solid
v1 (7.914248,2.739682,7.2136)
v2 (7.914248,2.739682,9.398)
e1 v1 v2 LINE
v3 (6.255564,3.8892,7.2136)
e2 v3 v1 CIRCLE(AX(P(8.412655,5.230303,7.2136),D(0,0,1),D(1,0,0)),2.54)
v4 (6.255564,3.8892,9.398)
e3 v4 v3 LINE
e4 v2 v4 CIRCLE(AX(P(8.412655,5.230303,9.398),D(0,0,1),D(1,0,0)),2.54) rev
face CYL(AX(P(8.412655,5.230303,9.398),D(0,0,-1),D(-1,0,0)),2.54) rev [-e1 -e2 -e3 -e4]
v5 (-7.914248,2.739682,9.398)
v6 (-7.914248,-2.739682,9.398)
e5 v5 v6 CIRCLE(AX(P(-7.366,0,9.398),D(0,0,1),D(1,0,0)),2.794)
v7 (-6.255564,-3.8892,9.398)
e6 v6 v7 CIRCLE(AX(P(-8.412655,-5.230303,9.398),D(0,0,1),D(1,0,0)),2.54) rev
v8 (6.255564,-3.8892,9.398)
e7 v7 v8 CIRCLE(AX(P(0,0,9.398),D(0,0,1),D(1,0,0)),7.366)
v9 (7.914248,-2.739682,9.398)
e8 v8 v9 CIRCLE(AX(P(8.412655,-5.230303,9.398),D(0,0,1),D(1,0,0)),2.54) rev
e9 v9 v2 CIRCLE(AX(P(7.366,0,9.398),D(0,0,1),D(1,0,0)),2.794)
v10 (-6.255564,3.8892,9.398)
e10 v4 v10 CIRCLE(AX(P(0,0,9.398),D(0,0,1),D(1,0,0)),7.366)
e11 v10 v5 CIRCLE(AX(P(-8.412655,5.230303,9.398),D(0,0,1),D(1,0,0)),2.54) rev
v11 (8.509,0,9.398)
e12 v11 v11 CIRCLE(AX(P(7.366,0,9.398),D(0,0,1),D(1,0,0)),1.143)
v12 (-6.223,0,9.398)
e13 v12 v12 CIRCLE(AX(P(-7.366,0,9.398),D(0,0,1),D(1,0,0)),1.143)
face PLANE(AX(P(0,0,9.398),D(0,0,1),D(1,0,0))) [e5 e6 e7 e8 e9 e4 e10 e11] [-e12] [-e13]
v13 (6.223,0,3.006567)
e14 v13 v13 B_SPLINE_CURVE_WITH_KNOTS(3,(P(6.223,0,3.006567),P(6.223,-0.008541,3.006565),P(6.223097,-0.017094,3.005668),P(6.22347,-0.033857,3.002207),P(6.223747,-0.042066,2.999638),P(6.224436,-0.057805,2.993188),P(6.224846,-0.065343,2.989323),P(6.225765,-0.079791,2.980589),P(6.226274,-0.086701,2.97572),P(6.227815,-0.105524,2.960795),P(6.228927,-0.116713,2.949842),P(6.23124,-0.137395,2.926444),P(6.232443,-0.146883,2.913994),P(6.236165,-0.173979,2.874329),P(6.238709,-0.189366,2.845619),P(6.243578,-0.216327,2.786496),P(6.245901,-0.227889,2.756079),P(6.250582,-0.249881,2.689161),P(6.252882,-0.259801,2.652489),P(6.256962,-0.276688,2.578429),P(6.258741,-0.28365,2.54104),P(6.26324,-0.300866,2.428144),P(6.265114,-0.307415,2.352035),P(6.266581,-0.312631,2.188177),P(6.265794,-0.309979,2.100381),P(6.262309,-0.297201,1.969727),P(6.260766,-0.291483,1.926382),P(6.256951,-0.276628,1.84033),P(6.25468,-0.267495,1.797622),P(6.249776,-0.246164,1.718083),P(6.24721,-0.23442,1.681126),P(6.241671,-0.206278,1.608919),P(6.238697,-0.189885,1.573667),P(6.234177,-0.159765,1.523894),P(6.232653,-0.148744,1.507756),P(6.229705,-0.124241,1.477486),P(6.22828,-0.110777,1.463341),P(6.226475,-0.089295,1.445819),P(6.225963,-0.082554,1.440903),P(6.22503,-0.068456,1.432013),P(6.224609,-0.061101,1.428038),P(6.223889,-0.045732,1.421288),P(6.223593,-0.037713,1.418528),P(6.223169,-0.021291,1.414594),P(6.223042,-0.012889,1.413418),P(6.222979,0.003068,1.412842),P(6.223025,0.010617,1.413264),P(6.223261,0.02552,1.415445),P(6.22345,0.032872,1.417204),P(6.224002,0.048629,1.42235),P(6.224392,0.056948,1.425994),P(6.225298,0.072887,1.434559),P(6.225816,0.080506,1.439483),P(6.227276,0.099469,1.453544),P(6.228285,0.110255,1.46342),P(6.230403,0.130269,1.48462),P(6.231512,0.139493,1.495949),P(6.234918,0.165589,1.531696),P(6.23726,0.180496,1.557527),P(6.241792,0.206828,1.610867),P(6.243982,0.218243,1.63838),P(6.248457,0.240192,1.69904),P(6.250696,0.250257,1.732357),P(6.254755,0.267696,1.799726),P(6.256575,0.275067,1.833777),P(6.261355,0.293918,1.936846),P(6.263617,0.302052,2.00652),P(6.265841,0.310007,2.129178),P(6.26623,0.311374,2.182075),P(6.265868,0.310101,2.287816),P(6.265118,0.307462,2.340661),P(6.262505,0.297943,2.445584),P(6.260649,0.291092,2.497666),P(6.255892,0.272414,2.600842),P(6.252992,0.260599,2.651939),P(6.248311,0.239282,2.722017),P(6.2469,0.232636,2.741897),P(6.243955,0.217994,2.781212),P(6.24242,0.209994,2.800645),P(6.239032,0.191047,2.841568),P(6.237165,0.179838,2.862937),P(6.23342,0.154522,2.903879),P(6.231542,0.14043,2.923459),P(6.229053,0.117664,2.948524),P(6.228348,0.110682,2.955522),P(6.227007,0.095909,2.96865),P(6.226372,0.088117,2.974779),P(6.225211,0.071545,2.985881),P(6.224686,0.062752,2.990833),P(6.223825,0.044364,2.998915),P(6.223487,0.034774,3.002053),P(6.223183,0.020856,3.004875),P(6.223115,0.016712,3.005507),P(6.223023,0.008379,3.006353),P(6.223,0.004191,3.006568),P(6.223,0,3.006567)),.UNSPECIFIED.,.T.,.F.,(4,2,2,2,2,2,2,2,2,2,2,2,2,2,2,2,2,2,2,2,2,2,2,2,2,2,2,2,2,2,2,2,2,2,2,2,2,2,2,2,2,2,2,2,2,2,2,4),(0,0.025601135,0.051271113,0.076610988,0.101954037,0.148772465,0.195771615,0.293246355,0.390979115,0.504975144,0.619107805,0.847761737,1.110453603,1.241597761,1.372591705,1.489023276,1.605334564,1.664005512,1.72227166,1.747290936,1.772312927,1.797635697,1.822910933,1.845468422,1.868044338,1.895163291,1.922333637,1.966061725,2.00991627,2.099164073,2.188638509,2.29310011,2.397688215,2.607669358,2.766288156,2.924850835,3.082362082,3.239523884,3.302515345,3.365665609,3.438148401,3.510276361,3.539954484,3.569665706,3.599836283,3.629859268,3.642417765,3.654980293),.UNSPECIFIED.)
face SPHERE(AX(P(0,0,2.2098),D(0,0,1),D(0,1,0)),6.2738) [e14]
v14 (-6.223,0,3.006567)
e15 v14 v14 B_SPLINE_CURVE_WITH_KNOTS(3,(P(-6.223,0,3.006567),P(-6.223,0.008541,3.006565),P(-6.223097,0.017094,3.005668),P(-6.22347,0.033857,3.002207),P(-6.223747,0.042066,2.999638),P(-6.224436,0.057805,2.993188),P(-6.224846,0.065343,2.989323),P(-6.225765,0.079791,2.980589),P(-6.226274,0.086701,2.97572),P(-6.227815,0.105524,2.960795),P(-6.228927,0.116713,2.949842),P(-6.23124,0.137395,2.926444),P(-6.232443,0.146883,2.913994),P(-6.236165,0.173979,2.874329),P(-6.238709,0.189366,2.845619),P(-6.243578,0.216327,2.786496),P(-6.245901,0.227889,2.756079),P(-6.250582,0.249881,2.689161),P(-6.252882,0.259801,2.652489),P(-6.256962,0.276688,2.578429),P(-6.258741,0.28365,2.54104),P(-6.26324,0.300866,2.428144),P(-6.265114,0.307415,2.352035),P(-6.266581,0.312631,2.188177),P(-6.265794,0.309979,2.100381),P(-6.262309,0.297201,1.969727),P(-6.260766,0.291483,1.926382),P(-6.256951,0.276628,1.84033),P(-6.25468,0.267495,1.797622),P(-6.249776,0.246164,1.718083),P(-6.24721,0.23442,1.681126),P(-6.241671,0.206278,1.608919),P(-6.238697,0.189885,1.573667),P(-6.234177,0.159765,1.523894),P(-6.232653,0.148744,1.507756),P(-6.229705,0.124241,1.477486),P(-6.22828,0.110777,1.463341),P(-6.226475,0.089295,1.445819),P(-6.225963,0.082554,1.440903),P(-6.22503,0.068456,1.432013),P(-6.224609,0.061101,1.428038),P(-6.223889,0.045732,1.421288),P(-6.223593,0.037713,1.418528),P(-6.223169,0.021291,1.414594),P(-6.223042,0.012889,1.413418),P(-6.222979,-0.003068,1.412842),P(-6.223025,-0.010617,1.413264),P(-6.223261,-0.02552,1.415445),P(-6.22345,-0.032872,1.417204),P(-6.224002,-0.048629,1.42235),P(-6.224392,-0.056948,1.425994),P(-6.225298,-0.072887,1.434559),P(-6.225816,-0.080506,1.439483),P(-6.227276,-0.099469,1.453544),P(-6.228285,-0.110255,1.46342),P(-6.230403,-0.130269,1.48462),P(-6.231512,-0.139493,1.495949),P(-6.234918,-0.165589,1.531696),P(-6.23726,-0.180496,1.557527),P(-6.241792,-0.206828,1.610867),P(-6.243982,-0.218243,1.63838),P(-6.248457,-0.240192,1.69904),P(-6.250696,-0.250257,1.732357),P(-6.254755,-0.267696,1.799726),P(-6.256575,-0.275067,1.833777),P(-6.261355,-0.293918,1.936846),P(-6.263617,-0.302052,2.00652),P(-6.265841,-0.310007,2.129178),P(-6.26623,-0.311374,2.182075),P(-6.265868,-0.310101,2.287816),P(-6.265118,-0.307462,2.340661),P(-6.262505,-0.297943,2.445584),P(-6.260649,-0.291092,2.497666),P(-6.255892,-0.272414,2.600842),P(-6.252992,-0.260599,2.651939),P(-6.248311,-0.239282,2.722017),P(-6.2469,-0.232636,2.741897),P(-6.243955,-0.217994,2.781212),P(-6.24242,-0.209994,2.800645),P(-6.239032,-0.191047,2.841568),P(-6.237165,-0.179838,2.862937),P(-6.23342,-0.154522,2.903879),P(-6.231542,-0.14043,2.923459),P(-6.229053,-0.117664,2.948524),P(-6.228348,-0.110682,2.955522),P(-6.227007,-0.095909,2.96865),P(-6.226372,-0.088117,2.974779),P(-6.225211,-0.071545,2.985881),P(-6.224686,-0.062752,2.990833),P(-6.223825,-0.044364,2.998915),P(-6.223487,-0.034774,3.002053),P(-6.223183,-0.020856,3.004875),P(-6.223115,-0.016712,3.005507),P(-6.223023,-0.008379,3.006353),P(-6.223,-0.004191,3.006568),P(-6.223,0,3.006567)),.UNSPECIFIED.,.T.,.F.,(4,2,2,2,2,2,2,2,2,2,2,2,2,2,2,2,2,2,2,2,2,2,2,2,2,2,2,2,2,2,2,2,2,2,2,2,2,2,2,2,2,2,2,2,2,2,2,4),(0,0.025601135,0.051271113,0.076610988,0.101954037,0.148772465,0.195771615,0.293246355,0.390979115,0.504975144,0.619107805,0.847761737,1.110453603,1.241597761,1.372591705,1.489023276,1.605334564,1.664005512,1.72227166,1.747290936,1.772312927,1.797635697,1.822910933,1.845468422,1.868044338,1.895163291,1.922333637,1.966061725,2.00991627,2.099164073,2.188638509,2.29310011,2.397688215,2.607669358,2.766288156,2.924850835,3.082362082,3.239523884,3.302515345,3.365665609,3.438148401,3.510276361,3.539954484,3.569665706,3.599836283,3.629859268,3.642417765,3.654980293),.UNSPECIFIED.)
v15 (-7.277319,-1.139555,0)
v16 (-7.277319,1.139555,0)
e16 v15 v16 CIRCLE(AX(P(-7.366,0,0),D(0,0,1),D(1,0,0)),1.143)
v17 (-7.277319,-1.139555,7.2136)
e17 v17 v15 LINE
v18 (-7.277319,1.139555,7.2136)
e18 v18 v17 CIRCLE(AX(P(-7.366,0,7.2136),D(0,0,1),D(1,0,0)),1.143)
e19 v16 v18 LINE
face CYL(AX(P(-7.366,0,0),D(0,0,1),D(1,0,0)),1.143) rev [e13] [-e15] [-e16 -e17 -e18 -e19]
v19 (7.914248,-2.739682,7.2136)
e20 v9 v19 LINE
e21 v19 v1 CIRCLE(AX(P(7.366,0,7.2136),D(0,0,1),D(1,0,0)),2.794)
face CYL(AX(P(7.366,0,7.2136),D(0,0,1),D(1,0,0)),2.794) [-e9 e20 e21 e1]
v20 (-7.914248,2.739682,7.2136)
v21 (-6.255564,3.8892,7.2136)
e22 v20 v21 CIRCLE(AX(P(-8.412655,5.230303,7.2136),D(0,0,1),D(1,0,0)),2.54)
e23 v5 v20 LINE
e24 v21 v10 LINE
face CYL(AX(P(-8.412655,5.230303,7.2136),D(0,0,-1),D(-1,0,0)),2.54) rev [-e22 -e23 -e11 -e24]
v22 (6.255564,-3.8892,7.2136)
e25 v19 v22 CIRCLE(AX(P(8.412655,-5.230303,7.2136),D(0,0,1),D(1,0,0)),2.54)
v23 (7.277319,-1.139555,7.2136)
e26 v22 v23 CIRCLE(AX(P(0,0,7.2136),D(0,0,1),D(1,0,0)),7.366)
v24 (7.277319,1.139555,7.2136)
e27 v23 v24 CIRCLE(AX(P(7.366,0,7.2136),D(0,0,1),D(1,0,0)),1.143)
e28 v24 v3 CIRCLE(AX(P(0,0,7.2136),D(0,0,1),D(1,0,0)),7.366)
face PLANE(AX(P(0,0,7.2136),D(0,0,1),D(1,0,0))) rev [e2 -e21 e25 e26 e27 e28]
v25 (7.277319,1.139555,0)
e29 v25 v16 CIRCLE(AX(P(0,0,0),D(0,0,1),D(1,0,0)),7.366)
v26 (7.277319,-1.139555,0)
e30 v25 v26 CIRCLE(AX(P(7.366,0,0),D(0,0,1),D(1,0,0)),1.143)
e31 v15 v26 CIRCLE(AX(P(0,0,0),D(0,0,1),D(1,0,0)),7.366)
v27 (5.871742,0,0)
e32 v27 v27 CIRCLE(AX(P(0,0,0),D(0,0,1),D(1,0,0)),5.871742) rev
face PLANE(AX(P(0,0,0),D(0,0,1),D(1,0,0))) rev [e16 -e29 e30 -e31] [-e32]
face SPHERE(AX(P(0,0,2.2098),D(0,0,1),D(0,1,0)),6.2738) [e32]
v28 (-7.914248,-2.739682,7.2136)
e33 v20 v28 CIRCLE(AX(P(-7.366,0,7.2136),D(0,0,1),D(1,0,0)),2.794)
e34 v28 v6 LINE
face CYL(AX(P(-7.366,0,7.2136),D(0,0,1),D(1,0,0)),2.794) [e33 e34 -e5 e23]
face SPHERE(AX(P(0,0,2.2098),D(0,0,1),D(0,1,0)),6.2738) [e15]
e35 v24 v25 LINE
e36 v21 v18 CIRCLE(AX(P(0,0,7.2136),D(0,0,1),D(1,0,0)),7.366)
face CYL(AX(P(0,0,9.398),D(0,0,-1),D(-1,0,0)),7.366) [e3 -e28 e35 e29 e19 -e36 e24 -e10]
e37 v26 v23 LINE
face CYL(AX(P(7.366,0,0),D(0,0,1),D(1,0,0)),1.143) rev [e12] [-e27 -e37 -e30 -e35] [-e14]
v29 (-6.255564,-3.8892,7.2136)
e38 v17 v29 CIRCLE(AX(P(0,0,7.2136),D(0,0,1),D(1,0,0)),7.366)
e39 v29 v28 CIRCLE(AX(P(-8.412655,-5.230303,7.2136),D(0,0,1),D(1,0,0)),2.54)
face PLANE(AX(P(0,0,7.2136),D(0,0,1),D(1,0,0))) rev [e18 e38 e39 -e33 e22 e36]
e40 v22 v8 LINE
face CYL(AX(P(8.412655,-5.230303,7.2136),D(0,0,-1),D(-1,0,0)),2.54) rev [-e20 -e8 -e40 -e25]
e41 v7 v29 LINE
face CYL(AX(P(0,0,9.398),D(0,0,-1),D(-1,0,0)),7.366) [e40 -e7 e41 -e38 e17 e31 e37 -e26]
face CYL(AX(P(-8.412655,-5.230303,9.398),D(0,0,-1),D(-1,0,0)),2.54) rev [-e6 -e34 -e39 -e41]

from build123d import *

# Parameters (mm, degrees)
ESQUISSE1_R             = 7.366
BOSS_EXTRU_1_DEPTH      = 9.398
BOSS_EXTRU_2_START      = -2.1844
BOSS_EXTRU_2_DEPTH      = 2.1844
CONG_1_R                = 2.54
ESQUISSE3_R             = 1.143
ENL_V_MAT_EXTRU_2_DEPTH = 16.678200152


with BuildPart() as part:
    # Esquisse1 → Boss.-Extru.1 (new body)
    with BuildSketch(Plane.XY):
        Circle(ESQUISSE1_R)
    extrude(amount=BOSS_EXTRU_1_DEPTH)

    # Esquisse2 → Boss.-Extru.2 (add)
    with BuildSketch(Plane.XY.offset(9.398).offset(BOSS_EXTRU_2_START)):
        with BuildLine():
            Line((7.366, 2.794), (6.815535195, 2.794))
            ThreePointArc((6.815535195, 2.794), (7.22707369, 1.423854584), (7.366, 0))
            Line((7.366, 0), (10.16, 0))
            ThreePointArc((10.16, 0), (9.341656347, 1.975656347), (7.366, 2.794))
        make_face()
        with BuildLine():
            Line((10.16, 0), (7.366, 0))
            ThreePointArc((7.366, 0), (7.22707369, -1.423854584), (6.815535195, -2.794))
            Line((6.815535195, -2.794), (7.366, -2.794))
            ThreePointArc((7.366, -2.794), (9.341656347, -1.975656347), (10.16, 0))
        make_face()
        with BuildLine():
            Line((-7.366, 0), (-10.16, 0))
            ThreePointArc((-10.16, 0), (-9.341656347, -1.975656347), (-7.366, -2.794))
            Line((-7.366, -2.794), (-6.815535195, -2.794))
            ThreePointArc((-6.815535195, -2.794), (-7.22707369, -1.423854584), (-7.366, 0))
        make_face()
        with BuildLine():
            Line((-6.815535195, 2.794), (-7.366, 2.794))
            ThreePointArc((-7.366, 2.794), (-9.341656347, 1.975656347), (-10.16, 0))
            Line((-10.16, 0), (-7.366, 0))
            ThreePointArc((-7.366, 0), (-7.22707369, 1.423854584), (-6.815535195, 2.794))
        make_face()
    extrude(amount=BOSS_EXTRU_2_DEPTH)

    # Congé1
    # the kernel refuses this fillet: 2.54 mm, written as the material it adds along each edge
    with BuildSketch(Plane(origin=(6.815535195, 2.794, 7.2136), x_dir=(-0.45524151464262924, 0.8903679932173465, 0), z_dir=(0, 0, 1)), Plane(origin=(-6.815535195, -2.794, 7.2136), x_dir=(0.4552415146426176, -0.8903679932173524, 0), z_dir=(0, 0, 1))) as cong_1_piece_1:
        with BuildLine():
            CenterArc((1.442130851, -2.531130754), CONG_1_R, 94.789504406, 46.813825589)
            Line((-0.548542223, -0.953531086), (-0.74760953, -0.795771119))
            ThreePointArc((-0.74760953, -0.795771119), (-0.476747902, -0.374484899), (-0.22615347, 0.115631345))
            Line((-0.22615347, 0.115631345), (0.021207807, 0.253113075))
            ThreePointArc((0.021207807, 0.253113075), (0.615026392, 0.228279187), (1.208844978, 0.253113075))
            Line((1.208844978, 0.253113075), (1.230052785, 0))
        make_face()
    extrude(amount=2.1844)
    with BuildSketch(Plane(origin=(6.815535195, -2.794, 7.2136), x_dir=(-0.4552415146426287, -0.8903679932173468, 0), z_dir=(0, 0, 1)), Plane(origin=(-6.815535195, 2.794, 7.2136), x_dir=(0.45524151464261825, 0.890367993217352, 0), z_dir=(0, 0, 1))) as cong_1_piece_2:
        with BuildLine():
            CenterArc((1.442130851, 2.531130754), CONG_1_R, 218.396670004, 46.813825589)
            Line((-0.548542223, 0.953531086), (-0.74760953, 0.795771119))
            ThreePointArc((-0.74760953, 0.795771119), (-0.476747902, 0.374484899), (-0.22615347, -0.115631345))
            Line((-0.22615347, -0.115631345), (0.021207807, -0.253113075))
            ThreePointArc((0.021207807, -0.253113075), (0.615026392, -0.228279187), (1.208844978, -0.253113075))
            Line((1.208844978, -0.253113075), (1.230052785, 0))
        make_face()
    extrude(amount=2.1844)

    # Esquisse3 → Enlèv. mat.-Extru.2 (cut, through all)
    with BuildSketch(Plane.XY.offset(9.398)):
        with Locations((-7.366, 0)):
            Circle(ESQUISSE3_R)
        with Locations((7.366, 0)):
            Circle(ESQUISSE3_R)
    extrude(amount=-ENL_V_MAT_EXTRU_2_DEPTH, mode=Mode.SUBTRACT)

    # Esquisse4 → Révolution4 (revolve)
    with BuildSketch(Plane(origin=(0, 0, 0), x_dir=(0, 0, -1), z_dir=(1, 0, 0))):
        with BuildLine():
            Line((-8.4836, 0), (4.064, 0))
            ThreePointArc((4.064, 0), (-2.2098, 6.2738), (-8.4836, 0))
        make_face()
    revolve(axis=Axis((0, 0, 7.037287666), (0, 0, -1)))


solid = part.part
